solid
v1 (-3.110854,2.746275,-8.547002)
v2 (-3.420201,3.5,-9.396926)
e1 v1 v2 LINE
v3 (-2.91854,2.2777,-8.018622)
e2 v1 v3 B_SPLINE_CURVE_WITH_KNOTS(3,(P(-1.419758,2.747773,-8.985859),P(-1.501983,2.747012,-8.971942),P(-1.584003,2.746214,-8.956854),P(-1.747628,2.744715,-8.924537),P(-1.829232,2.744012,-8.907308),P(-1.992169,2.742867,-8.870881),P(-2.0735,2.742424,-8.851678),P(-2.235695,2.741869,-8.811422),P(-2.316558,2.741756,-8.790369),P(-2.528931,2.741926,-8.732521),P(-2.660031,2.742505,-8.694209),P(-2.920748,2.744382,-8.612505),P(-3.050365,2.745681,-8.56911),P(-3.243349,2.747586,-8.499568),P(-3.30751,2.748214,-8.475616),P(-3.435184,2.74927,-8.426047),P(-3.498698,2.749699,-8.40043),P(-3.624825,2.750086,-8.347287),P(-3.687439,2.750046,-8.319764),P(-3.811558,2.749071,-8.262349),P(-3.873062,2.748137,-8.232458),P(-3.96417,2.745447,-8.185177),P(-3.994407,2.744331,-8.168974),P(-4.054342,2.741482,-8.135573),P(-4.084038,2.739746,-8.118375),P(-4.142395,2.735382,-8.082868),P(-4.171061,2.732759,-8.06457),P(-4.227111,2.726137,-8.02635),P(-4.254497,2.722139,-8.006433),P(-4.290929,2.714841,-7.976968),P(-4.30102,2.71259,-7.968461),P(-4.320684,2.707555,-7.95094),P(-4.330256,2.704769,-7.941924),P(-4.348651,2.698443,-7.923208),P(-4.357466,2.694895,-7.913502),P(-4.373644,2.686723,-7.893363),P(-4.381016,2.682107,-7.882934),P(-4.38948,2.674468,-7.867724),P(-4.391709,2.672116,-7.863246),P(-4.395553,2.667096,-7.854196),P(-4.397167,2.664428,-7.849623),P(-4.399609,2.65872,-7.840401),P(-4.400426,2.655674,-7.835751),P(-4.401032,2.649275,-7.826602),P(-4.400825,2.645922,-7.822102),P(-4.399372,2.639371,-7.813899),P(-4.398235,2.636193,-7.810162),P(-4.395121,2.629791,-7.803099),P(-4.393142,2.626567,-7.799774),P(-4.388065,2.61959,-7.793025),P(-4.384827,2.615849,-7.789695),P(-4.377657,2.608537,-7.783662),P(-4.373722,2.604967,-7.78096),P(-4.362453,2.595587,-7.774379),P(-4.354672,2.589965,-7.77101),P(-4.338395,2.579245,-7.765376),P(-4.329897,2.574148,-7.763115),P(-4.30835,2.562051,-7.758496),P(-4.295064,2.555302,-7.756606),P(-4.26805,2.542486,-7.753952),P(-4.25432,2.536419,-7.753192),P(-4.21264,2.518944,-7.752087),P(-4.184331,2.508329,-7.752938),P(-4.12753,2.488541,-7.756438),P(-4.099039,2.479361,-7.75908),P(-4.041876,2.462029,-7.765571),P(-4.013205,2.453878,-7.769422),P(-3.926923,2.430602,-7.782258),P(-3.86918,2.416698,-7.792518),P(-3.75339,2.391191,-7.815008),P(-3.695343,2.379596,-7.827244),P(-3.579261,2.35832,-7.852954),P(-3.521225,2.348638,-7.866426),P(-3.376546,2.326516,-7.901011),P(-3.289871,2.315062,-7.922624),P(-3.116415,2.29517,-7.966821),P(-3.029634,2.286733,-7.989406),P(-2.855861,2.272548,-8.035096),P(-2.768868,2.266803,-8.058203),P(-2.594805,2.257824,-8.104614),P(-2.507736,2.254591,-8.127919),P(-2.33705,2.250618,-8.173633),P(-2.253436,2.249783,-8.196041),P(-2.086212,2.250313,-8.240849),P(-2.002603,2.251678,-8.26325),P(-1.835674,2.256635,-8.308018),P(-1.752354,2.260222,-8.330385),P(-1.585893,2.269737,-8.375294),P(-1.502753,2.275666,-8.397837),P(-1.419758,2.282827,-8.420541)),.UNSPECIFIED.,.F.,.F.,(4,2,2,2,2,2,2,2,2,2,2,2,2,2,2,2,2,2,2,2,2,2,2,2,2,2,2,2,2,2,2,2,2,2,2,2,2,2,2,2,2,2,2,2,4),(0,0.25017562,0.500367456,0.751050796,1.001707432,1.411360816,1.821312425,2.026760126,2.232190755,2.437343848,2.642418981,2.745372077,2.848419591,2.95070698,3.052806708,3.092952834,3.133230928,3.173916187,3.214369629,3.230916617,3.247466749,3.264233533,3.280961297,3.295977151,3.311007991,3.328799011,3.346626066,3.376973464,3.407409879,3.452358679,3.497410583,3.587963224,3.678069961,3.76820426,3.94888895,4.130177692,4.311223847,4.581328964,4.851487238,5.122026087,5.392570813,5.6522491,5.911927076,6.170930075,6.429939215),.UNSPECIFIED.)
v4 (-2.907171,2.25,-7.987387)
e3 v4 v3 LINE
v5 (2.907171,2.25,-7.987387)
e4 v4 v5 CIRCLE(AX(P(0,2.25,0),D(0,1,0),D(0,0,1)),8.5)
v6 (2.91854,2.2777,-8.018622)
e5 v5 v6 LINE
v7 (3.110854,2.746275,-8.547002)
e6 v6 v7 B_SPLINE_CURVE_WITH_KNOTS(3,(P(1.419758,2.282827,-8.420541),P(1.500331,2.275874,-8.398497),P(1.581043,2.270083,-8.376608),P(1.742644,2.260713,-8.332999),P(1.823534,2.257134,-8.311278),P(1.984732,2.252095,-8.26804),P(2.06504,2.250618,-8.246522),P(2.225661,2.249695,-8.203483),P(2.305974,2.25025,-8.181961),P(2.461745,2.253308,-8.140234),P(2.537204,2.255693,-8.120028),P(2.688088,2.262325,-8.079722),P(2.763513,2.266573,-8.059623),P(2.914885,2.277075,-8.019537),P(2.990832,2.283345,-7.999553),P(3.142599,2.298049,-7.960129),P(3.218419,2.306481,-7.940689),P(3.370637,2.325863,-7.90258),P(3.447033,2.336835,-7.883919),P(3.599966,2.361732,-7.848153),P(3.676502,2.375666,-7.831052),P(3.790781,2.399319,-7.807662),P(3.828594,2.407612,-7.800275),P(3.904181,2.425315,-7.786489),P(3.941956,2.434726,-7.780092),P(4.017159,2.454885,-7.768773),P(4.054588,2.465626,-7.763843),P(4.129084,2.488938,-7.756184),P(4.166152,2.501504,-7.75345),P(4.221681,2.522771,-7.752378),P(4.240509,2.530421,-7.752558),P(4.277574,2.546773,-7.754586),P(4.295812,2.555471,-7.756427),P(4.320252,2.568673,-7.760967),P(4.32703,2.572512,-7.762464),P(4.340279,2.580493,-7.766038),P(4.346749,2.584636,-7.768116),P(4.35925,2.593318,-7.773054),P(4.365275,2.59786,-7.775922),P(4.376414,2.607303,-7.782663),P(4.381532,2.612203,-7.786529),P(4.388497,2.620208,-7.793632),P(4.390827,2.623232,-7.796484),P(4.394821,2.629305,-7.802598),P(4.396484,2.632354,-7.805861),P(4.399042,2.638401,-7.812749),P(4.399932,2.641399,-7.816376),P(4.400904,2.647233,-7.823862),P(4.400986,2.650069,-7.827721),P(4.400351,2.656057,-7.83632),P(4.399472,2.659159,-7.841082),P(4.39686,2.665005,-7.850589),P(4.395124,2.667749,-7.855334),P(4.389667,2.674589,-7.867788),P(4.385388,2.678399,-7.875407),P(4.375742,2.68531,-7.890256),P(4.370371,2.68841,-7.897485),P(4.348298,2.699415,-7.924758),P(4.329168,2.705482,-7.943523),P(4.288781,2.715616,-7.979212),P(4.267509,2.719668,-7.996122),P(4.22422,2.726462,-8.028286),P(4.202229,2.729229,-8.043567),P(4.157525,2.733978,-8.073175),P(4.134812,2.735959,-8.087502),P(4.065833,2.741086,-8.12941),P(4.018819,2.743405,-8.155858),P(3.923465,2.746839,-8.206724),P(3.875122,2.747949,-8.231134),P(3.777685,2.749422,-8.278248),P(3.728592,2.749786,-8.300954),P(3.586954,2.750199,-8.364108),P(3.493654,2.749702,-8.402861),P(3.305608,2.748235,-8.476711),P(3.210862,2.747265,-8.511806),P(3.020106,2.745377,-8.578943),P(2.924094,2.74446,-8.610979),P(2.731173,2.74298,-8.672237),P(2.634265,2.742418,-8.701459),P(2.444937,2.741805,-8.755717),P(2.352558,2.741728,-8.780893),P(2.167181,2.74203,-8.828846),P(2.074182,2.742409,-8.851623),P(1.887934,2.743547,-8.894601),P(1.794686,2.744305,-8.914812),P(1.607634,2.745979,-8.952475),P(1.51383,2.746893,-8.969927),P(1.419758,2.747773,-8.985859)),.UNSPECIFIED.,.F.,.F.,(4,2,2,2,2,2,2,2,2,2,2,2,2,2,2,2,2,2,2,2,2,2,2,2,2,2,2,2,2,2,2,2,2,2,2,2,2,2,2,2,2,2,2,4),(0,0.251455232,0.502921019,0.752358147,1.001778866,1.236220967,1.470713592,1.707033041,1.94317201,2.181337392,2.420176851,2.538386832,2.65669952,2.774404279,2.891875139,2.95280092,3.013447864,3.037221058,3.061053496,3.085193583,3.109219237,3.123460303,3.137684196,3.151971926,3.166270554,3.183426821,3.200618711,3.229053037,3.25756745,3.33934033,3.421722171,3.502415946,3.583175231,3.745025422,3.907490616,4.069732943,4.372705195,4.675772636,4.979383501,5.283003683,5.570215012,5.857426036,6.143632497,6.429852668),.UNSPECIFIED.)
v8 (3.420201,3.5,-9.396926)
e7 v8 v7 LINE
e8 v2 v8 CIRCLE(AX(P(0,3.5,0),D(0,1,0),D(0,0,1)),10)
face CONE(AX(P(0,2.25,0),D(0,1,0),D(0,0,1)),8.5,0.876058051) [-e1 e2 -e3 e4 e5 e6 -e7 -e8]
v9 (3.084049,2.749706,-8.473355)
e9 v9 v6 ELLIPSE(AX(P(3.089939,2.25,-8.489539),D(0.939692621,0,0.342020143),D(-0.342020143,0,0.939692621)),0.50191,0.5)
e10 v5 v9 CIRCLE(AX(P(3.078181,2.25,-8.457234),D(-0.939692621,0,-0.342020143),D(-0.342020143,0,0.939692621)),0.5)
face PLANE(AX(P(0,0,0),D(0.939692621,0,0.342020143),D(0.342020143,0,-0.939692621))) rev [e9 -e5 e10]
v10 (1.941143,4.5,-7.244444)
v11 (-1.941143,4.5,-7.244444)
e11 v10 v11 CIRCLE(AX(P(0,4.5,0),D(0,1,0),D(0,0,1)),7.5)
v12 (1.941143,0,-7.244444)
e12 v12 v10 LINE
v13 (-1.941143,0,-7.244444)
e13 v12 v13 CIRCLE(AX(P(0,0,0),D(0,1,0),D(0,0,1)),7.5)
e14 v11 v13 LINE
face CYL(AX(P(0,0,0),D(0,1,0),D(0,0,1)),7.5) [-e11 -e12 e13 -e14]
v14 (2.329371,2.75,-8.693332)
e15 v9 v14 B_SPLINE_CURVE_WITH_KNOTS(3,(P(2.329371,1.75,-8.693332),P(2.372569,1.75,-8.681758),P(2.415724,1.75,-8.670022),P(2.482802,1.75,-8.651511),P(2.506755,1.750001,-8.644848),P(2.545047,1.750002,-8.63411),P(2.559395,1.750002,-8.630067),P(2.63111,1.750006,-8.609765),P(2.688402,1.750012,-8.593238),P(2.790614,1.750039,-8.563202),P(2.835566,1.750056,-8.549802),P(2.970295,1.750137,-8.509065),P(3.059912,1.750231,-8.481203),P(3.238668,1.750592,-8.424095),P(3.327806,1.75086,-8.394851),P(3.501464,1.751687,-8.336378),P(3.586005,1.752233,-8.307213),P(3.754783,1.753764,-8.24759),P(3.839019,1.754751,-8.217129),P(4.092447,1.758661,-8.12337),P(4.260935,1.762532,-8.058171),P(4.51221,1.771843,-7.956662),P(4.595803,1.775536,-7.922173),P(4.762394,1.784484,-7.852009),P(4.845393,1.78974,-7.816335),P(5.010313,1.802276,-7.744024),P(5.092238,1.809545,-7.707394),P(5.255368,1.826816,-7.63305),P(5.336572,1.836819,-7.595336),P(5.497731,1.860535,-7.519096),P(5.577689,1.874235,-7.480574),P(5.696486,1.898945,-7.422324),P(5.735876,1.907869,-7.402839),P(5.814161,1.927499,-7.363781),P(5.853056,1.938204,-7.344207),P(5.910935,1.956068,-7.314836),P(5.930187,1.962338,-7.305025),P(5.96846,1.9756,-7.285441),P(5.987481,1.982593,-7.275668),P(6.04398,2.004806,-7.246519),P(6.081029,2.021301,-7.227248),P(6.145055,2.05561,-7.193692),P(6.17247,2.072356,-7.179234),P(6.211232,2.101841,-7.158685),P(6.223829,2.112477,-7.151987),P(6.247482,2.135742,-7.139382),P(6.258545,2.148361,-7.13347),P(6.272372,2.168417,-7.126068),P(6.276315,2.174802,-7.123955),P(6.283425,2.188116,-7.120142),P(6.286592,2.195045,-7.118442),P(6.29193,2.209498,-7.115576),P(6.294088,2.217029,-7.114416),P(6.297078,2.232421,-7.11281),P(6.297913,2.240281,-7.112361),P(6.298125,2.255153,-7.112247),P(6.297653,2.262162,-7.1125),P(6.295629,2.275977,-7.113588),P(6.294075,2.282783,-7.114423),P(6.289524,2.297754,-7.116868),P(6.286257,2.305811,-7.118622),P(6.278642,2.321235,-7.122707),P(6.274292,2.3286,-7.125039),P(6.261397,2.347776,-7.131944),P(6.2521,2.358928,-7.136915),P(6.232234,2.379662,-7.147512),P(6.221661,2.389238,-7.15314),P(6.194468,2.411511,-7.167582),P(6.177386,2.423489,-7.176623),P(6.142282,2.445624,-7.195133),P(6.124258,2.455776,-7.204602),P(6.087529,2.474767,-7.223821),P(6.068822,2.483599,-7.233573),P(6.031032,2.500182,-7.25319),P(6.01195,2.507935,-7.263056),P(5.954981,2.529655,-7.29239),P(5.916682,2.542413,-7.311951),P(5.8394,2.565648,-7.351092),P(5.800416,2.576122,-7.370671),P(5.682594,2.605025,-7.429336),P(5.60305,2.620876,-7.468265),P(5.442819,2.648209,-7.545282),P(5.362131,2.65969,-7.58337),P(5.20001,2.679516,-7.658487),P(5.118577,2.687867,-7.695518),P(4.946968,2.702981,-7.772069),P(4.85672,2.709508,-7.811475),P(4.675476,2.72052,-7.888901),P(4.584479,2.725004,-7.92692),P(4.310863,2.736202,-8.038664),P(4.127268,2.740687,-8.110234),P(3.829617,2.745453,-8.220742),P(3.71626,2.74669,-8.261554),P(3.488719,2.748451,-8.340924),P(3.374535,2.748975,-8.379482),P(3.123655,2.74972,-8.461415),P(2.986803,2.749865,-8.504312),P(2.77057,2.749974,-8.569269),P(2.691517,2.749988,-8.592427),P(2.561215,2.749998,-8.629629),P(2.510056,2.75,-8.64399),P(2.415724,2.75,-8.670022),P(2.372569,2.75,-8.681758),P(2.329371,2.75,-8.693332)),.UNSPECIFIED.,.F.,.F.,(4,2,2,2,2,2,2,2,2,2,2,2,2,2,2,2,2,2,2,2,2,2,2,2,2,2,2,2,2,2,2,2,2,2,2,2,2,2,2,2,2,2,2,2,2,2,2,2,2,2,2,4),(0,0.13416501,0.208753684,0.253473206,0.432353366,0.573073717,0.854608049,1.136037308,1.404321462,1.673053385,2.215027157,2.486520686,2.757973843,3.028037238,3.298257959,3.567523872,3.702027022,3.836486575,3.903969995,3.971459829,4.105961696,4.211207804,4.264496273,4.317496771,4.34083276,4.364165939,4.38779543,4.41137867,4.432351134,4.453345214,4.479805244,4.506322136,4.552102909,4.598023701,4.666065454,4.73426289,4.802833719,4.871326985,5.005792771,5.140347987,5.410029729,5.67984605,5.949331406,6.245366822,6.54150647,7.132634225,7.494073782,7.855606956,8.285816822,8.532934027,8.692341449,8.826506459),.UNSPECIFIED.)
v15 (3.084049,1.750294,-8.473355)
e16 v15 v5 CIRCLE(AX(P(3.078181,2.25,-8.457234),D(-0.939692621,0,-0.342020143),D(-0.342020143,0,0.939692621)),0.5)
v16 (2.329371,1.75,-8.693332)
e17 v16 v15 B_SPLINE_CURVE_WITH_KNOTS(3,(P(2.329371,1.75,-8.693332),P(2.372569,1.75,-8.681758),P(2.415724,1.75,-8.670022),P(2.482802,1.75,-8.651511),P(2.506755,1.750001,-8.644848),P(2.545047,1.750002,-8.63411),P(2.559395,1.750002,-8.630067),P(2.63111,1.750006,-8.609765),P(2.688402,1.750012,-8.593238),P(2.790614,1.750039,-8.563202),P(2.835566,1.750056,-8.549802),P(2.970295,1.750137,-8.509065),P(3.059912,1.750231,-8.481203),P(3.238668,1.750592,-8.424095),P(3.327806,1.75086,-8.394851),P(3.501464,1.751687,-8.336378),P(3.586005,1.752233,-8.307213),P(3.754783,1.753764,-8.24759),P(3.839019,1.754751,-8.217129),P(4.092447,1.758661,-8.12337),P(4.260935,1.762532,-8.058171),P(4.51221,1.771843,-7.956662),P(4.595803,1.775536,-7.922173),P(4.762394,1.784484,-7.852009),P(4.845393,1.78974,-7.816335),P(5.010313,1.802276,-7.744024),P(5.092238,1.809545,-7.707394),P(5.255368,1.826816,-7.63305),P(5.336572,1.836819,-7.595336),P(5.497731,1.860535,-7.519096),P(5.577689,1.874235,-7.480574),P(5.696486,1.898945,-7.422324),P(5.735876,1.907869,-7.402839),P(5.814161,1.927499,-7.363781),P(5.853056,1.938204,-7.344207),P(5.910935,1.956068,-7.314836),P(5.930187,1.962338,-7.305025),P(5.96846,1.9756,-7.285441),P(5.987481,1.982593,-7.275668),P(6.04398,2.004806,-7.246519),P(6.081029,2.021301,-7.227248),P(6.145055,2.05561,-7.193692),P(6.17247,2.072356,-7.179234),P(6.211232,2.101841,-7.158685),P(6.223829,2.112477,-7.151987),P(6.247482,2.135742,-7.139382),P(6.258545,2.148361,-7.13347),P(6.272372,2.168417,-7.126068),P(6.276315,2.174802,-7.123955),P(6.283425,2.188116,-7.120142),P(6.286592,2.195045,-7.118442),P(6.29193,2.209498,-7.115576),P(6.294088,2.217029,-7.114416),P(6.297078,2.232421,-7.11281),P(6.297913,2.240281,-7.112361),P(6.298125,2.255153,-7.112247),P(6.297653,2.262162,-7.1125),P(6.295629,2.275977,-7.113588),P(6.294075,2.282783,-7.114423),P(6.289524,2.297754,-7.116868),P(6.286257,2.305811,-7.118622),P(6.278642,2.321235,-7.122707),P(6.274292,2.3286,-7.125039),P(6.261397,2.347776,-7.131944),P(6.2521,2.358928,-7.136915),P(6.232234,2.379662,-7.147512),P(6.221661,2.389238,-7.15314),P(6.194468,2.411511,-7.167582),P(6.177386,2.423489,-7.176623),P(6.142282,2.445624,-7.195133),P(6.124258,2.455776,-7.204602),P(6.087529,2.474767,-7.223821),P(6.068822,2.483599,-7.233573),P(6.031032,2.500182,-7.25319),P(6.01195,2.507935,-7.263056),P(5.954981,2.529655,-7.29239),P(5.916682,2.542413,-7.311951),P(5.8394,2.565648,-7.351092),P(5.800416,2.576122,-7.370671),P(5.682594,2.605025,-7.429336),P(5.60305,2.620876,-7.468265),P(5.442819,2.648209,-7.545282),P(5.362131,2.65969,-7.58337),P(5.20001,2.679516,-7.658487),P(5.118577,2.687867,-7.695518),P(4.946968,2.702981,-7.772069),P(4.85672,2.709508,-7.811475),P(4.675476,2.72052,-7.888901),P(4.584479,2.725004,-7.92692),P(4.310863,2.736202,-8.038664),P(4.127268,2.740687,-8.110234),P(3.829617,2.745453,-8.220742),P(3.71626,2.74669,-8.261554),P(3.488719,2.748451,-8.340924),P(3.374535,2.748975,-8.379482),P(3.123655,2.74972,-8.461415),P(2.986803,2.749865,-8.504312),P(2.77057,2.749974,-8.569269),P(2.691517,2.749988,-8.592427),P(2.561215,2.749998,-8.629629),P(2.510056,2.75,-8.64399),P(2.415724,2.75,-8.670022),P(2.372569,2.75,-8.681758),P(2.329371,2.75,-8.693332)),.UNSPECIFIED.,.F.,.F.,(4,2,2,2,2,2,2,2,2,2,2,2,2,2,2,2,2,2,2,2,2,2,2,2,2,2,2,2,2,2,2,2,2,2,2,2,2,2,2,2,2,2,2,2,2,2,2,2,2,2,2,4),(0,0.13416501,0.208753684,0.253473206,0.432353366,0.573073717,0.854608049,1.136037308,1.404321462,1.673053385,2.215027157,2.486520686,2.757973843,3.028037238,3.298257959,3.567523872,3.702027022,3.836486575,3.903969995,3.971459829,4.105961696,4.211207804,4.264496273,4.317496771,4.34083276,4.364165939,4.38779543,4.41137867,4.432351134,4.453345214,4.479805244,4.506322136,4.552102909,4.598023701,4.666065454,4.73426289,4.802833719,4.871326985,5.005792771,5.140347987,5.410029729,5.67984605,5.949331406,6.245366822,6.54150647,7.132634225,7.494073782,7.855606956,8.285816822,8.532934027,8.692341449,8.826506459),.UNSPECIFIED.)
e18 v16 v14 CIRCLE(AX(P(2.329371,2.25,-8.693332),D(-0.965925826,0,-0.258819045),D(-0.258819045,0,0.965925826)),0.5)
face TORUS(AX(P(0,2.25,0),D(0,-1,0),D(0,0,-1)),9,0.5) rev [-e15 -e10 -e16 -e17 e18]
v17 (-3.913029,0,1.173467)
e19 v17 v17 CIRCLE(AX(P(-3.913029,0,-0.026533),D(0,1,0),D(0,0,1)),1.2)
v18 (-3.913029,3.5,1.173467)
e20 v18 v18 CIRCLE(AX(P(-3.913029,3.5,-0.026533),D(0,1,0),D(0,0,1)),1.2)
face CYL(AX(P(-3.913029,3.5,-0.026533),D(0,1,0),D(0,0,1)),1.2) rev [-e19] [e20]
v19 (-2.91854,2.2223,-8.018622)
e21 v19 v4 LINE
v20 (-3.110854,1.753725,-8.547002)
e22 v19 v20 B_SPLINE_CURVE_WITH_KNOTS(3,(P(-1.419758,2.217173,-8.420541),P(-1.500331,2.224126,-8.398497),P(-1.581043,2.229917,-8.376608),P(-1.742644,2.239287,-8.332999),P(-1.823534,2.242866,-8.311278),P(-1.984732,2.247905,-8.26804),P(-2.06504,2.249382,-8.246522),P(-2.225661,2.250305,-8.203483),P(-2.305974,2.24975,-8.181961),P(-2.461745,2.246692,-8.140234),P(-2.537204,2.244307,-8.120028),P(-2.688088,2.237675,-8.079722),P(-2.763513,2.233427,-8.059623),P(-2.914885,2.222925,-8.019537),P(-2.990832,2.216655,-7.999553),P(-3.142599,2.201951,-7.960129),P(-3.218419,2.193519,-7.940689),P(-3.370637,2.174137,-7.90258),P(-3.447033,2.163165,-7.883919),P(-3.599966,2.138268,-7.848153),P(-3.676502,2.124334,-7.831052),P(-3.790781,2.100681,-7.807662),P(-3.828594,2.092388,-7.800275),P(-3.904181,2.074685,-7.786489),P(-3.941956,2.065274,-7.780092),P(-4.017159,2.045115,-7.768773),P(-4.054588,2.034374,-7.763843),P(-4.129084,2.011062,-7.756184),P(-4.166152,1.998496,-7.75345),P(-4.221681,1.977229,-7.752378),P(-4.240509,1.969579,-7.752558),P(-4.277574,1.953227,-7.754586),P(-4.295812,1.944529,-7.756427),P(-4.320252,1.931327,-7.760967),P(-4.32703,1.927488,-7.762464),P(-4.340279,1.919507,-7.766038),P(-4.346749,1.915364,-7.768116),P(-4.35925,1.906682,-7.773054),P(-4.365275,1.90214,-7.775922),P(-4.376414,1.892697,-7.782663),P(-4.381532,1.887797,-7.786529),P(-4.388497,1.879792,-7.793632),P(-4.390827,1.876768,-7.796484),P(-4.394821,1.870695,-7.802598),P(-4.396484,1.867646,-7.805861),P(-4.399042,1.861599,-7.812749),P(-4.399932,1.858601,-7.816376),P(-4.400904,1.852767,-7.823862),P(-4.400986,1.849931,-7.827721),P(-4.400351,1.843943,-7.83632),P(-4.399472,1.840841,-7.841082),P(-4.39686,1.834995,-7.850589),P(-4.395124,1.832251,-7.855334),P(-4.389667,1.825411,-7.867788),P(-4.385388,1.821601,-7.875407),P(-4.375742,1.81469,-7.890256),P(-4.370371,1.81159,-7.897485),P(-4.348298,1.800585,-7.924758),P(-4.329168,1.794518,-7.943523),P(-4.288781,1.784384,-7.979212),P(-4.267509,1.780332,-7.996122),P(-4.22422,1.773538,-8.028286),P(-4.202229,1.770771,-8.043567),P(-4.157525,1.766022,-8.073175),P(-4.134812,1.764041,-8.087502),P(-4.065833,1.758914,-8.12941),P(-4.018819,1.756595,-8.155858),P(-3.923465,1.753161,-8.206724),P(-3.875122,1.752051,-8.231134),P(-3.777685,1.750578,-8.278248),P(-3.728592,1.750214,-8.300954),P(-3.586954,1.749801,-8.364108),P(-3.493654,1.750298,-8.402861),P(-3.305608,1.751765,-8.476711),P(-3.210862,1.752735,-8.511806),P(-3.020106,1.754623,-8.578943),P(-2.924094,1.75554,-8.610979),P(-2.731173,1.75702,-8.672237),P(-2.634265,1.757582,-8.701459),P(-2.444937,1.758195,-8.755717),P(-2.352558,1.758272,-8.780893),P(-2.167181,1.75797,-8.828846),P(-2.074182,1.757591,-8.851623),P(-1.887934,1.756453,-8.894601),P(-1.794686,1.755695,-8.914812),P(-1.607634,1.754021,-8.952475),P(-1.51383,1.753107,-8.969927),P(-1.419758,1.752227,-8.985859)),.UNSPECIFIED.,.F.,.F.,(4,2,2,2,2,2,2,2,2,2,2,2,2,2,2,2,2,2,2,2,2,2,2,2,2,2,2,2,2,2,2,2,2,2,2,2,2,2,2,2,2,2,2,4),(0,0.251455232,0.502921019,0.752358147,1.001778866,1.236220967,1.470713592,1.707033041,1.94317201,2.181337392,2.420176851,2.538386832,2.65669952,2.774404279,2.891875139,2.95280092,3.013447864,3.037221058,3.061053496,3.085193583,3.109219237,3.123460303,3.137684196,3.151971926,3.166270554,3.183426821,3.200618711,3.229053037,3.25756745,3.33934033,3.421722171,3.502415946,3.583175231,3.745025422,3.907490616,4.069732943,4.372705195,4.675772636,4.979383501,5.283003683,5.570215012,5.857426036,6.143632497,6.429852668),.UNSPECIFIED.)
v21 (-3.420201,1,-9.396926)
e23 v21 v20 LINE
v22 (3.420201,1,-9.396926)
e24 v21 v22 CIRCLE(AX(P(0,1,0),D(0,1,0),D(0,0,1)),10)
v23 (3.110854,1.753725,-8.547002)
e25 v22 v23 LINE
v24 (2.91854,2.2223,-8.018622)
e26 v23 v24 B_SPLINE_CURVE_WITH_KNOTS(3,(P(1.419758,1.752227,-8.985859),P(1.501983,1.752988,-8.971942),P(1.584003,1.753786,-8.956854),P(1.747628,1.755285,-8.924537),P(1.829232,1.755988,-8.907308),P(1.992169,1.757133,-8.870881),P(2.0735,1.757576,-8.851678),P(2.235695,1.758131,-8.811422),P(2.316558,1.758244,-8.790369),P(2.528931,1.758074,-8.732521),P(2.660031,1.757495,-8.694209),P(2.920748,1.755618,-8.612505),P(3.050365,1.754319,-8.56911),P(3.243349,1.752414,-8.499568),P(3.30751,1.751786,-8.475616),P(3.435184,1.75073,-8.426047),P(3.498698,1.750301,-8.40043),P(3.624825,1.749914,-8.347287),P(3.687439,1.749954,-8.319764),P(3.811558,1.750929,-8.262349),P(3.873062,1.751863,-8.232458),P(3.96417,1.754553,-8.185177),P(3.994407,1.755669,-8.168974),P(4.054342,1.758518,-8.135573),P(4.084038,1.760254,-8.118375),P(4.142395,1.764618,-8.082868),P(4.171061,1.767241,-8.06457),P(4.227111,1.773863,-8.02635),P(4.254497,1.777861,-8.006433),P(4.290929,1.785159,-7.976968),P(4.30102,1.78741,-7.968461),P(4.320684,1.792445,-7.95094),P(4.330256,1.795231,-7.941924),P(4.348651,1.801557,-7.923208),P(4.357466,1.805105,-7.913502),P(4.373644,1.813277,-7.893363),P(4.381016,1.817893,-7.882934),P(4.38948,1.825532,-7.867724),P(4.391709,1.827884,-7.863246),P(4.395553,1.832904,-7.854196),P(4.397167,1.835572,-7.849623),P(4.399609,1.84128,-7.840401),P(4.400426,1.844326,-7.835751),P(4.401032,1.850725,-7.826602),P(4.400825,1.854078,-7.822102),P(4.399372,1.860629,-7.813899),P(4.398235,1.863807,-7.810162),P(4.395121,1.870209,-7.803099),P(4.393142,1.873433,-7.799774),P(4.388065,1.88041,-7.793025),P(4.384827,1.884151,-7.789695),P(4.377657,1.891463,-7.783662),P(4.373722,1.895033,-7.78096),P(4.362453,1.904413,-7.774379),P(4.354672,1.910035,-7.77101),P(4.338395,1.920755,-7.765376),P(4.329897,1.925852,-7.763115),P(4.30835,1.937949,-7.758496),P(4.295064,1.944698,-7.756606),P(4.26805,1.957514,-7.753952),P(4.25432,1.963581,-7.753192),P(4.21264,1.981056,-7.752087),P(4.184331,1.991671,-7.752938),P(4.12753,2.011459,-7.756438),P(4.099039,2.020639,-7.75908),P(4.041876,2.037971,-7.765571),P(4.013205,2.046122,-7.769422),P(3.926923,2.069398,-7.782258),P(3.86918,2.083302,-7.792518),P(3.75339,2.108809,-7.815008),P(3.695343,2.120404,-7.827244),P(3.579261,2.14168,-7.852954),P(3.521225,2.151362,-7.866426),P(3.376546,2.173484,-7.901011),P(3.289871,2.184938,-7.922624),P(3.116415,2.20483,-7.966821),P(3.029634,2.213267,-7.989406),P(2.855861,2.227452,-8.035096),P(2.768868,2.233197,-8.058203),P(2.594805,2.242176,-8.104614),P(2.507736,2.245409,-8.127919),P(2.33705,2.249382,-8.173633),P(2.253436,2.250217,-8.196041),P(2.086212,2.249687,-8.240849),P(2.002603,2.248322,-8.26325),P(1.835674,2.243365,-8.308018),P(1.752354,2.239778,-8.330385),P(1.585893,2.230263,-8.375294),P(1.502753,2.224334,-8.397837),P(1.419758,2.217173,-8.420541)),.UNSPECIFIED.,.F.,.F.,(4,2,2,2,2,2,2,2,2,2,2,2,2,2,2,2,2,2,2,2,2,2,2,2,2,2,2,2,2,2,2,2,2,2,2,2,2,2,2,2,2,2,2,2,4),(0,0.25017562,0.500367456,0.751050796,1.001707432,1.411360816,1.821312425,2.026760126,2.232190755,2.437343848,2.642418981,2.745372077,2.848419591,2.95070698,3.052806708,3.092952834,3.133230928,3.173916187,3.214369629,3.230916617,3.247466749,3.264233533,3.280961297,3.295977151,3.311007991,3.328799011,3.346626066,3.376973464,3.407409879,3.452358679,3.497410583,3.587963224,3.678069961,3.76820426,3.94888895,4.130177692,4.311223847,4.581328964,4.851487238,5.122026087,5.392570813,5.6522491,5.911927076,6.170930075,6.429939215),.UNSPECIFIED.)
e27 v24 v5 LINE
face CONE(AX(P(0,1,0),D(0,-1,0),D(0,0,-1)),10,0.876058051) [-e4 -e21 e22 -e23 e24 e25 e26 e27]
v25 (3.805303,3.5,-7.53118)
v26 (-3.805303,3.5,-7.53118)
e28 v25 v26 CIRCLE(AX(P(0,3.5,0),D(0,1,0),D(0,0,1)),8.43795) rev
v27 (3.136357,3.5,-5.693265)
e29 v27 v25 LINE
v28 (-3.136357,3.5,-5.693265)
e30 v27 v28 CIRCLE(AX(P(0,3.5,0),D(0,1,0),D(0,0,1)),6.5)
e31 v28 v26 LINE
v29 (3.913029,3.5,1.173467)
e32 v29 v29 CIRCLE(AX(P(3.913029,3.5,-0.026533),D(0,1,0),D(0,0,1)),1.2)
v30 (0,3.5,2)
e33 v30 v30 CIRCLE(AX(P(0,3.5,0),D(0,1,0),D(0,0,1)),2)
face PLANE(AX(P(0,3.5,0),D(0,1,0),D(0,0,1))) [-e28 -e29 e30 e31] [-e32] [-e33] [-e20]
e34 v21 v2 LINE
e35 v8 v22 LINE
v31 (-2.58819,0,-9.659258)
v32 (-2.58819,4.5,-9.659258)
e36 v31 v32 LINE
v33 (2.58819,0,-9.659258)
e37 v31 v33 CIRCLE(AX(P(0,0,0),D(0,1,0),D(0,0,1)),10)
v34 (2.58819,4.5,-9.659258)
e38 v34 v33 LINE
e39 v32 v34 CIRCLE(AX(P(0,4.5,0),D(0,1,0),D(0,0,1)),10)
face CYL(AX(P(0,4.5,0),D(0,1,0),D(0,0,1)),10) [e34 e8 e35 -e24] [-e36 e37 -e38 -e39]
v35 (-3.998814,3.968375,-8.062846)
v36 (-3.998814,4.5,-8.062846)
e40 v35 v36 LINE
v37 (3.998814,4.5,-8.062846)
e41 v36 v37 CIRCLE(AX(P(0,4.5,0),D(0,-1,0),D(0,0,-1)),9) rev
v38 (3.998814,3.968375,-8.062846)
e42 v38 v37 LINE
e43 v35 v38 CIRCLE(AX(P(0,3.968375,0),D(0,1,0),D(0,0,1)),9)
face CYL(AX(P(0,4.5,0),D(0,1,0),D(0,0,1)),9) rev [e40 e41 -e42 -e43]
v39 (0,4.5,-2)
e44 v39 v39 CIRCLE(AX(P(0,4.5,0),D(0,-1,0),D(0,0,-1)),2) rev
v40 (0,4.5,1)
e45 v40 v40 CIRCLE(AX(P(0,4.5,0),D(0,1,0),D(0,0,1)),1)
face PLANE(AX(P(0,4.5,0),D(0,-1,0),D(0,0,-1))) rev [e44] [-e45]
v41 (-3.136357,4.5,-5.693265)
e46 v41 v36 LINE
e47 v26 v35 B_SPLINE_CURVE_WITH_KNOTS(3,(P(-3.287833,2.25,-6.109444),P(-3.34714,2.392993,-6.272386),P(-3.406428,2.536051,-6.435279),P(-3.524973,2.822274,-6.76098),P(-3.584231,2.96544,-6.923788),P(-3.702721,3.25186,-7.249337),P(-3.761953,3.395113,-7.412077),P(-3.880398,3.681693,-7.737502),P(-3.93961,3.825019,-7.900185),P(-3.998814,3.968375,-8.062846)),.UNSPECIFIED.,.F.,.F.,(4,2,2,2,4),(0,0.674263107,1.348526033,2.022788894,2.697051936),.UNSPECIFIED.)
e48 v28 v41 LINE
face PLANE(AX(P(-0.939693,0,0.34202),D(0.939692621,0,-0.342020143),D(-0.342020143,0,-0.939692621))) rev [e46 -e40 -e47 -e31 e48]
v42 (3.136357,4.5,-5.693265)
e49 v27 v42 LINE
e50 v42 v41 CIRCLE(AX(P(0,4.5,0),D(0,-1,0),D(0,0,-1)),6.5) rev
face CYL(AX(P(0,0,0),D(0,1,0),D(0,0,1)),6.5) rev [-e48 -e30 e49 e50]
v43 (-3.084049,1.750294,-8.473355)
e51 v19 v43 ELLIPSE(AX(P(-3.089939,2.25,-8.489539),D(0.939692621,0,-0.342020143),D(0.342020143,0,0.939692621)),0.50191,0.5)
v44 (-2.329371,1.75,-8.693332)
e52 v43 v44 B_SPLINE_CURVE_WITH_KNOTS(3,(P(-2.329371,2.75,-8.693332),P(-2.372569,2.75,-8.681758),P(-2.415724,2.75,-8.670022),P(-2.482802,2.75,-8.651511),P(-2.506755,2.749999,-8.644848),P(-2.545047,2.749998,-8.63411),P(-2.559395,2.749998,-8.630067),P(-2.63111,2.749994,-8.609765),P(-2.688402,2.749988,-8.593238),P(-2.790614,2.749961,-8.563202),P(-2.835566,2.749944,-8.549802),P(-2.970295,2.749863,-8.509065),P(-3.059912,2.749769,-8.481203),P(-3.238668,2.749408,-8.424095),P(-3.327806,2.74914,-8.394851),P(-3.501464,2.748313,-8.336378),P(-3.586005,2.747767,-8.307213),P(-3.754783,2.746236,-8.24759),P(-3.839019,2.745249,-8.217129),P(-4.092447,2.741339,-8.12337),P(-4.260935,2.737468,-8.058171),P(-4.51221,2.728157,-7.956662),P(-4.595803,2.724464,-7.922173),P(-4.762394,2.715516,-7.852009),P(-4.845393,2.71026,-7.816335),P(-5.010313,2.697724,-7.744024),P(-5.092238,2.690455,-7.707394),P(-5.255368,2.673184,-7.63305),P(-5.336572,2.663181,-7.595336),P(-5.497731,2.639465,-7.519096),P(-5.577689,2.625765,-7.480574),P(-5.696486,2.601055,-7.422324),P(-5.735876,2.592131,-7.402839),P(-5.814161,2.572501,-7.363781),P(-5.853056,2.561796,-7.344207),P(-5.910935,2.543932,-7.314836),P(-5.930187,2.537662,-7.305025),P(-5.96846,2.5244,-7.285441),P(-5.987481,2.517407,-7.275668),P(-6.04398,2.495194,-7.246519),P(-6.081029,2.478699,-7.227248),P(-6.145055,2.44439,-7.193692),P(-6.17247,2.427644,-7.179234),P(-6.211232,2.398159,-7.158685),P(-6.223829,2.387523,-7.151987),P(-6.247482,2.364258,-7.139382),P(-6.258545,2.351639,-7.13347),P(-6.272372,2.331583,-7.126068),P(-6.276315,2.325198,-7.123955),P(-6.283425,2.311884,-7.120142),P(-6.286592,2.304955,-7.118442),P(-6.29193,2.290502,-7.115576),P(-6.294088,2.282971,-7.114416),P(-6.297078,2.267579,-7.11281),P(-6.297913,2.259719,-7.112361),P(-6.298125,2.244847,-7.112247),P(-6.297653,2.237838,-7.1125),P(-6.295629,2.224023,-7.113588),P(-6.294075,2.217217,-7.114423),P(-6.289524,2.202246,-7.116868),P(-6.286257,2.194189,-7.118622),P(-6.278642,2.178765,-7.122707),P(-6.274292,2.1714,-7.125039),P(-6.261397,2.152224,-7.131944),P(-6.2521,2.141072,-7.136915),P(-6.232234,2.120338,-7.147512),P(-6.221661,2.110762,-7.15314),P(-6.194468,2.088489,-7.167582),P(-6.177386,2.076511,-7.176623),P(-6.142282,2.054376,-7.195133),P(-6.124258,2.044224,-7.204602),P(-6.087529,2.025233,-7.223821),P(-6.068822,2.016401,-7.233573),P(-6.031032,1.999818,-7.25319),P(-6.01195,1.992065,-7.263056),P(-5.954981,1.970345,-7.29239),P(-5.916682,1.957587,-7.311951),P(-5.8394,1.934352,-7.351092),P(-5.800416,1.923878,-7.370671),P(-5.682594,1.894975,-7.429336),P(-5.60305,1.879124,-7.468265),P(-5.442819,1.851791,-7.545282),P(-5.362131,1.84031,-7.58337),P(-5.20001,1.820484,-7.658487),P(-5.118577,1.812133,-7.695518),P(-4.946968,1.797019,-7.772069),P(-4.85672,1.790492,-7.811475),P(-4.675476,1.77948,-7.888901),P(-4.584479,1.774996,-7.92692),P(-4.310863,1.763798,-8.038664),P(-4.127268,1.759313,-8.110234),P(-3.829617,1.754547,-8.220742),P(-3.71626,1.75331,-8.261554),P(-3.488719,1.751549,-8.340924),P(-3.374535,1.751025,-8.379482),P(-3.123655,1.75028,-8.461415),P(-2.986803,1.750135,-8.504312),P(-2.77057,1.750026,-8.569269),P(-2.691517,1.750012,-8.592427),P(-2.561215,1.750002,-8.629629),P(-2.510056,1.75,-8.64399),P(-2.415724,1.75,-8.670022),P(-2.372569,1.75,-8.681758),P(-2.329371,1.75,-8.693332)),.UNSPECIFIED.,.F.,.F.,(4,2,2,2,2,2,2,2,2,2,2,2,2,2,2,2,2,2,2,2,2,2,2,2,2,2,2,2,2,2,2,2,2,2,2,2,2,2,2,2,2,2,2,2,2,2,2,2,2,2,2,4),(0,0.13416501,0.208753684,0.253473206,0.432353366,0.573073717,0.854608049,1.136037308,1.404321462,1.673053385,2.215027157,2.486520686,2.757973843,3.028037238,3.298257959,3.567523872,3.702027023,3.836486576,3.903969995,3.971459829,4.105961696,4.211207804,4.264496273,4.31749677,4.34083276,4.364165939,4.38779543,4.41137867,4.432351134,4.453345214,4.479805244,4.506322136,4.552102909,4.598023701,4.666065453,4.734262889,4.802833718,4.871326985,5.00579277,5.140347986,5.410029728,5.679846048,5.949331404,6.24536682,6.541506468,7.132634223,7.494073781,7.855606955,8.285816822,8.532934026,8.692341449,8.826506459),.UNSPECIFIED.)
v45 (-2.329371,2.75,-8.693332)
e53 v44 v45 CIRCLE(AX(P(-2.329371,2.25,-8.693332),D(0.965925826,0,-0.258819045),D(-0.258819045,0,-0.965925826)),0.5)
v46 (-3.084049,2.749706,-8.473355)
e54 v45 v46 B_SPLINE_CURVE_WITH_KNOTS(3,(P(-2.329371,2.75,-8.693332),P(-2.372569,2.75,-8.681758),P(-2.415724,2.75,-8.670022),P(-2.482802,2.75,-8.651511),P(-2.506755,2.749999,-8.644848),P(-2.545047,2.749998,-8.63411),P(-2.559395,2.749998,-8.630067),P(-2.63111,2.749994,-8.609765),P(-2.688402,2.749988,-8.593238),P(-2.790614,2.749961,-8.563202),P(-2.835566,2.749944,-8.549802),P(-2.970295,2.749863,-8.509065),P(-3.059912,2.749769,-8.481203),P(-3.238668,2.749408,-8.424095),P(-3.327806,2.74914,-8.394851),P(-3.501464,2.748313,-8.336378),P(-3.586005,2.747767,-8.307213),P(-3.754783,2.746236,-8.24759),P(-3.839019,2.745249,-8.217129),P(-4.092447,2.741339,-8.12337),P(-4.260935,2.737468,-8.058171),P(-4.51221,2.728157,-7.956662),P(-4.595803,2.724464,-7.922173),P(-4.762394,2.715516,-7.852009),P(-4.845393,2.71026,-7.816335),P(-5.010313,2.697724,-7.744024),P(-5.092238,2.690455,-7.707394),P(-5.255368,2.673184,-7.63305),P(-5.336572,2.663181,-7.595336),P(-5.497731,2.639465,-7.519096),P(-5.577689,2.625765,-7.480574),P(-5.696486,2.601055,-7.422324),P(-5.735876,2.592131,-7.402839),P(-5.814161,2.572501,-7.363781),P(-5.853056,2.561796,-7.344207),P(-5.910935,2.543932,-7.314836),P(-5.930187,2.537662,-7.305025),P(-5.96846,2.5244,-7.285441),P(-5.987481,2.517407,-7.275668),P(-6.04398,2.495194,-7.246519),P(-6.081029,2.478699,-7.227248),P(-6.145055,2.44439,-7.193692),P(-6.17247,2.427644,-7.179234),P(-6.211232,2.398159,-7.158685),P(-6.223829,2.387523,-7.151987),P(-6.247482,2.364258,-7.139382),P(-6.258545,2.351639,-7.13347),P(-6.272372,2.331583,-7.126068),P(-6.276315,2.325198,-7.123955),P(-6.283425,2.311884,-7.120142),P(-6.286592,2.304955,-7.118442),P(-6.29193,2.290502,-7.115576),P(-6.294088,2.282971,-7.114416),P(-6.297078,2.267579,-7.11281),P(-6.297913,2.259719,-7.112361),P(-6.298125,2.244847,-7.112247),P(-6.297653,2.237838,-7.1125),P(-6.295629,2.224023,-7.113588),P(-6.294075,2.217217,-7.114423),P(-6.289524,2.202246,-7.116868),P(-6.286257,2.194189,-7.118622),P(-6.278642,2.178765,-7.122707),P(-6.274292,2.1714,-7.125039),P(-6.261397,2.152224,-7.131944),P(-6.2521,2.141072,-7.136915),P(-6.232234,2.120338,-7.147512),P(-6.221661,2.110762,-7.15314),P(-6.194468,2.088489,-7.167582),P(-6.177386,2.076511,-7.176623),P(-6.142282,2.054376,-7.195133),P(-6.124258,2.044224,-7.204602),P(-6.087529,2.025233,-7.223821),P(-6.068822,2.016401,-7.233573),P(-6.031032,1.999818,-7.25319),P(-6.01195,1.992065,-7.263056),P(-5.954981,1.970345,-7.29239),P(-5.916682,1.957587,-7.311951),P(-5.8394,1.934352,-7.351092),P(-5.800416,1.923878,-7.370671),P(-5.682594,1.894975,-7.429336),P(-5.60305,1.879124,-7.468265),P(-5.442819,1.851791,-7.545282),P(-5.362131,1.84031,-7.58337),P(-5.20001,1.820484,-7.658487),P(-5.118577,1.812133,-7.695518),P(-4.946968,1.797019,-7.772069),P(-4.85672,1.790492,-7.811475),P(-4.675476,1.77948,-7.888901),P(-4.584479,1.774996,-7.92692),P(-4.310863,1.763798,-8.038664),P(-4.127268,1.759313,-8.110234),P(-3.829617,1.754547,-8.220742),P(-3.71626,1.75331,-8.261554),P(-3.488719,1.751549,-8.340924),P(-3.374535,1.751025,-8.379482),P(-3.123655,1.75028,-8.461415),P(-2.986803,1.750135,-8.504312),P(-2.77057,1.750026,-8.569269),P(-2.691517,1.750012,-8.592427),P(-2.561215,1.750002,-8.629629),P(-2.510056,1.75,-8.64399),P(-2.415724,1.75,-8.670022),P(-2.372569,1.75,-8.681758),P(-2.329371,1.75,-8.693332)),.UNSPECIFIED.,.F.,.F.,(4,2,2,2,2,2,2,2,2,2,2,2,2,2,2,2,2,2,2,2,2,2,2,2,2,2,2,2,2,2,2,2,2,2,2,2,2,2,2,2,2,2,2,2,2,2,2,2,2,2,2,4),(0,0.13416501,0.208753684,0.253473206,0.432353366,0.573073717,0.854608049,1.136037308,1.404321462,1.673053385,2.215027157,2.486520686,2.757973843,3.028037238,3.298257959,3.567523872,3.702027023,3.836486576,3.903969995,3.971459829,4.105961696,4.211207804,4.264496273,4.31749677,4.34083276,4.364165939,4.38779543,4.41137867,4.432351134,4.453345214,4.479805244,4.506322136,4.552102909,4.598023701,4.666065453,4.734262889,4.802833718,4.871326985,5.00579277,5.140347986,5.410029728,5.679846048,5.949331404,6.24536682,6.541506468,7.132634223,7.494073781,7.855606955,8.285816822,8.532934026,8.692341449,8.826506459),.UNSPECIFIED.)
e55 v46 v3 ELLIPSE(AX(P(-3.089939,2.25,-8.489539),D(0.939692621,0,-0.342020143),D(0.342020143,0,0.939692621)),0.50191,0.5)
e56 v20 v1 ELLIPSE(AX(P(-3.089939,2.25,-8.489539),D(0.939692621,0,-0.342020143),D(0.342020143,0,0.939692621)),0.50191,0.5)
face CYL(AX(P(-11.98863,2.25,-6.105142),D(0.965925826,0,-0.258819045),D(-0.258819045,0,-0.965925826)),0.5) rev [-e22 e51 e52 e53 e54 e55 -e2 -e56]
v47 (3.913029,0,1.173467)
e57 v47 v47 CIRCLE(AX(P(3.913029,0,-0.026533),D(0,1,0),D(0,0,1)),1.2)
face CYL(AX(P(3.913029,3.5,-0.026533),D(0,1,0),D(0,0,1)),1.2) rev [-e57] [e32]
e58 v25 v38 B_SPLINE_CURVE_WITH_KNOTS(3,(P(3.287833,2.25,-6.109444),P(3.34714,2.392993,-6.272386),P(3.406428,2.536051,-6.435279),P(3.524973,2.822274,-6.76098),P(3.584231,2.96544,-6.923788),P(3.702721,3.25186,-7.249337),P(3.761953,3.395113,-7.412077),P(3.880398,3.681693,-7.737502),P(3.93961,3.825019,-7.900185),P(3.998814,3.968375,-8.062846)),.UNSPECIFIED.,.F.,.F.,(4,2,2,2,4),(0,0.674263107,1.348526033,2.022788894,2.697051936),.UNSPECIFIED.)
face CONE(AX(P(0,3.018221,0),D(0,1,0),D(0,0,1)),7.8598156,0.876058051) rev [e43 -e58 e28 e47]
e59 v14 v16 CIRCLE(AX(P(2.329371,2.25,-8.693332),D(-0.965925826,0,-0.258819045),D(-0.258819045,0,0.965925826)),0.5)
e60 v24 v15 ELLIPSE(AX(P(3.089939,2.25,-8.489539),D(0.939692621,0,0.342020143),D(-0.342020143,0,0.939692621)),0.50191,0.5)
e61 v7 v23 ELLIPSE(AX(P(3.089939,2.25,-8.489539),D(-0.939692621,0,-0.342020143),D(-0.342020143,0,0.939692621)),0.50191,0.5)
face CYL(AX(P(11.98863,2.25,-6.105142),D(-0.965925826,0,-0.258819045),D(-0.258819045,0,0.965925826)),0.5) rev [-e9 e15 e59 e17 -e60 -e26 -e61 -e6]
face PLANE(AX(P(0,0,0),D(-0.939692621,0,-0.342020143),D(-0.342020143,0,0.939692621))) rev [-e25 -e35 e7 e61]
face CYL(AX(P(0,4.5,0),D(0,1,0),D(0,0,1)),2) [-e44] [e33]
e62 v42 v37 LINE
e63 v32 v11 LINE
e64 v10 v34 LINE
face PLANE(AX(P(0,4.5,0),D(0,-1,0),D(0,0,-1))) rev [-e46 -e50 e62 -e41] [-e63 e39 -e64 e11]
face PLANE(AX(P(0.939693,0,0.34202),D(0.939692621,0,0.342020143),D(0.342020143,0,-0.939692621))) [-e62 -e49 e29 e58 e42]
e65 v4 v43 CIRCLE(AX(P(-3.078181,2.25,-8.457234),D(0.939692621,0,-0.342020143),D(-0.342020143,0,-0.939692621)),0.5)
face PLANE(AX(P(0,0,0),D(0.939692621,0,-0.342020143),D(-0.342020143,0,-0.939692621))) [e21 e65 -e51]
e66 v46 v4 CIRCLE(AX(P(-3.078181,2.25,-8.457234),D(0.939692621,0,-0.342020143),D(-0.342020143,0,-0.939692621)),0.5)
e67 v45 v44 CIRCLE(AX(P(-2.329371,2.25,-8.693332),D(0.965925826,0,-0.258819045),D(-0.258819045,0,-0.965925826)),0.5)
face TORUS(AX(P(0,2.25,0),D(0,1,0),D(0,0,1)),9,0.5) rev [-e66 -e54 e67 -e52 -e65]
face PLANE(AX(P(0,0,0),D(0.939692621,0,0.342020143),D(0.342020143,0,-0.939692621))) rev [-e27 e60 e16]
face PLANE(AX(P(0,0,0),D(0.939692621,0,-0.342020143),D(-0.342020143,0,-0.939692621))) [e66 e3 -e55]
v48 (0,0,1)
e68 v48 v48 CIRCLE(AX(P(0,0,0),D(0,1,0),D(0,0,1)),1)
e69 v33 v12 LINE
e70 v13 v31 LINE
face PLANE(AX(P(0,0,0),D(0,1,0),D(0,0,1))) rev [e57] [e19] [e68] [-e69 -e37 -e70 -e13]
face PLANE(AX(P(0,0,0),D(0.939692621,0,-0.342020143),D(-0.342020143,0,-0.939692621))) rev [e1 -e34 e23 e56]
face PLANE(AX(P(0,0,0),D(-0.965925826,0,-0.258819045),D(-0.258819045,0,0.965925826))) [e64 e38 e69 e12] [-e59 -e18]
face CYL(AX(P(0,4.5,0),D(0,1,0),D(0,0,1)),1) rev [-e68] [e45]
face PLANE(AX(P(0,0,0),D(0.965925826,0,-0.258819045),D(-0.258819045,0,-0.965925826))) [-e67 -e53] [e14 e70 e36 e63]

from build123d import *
from build123d.topology import SkipClean

# Parameters (mm, degrees)
CUT_EXTRUDE1_DEPTH       = 15.84082208
SHELL2_START             = 3.968374946
SHELL2_OUTLINE_R         = 2
SHELL2_DEPTH             = 0.531625054
SHELL2_START_2           = 3
SHELL2_3_DEPTH           = 0.968374946
SKETCH6_W                = 2.5
SKETCH6_H                = 4.5
SKETCH6_R                = 0.5
REVOLVE2_ANGLE           = 5
SKETCH9_R                = 0.5
REVOLVE3_ANGLE           = 5
SKETCH13_R               = 0.5
CUT_EXTRUDE3_DEPTH       = 10
CUT_EXTRUDE4_START       = -3
CUT_EXTRUDE4_OUTLINE_R   = 0.5
CUT_EXTRUDE4_DEPTH       = 3
M2_CLEARANCE_HOLE1_D     = 2.4
M2_CLEARANCE_HOLE1_DEPTH = 3.5
M2_CLEARANCE_HOLE1_TIP   = 0.721032743


with BuildPart() as part:
    # Sketch2 → Revolve1 (revolve)
    with BuildSketch(Plane.XY, mode=Mode.PRIVATE) as revolve1_sk:
        Polygon((10, 4.5), (1, 4.5), (1, 0), (10, 0), (10, 1), (8.5, 2.25), (10, 3.5), align=None)
    revolve(revolve1_sk.sketch.rotate(Axis((0, 4.5, 0), (0, -1, 0)), 90), axis=Axis((0, 4.5, 0), (0, -1, 0)))

    # Sketch3 → Cut-Extrude1 (cut, through all)
    with BuildSketch(Plane(origin=(0, 4.5, 0), x_dir=(1, 0, 0), z_dir=(0, 1, 0))):
        with BuildLine():
            Line((-3.420201433, 9.396926208), (-2.565151075, 7.047694656))
            ThreePointArc((-2.565151075, 7.047694656), (0, 7.5), (2.565151075, 7.047694656))
            Line((2.565151075, 7.047694656), (3.420201433, 9.396926208))
            ThreePointArc((3.420201433, 9.396926208), (0, 10), (-3.420201433, 9.396926208))
        make_face()
    extrude(amount=-CUT_EXTRUDE1_DEPTH, mode=Mode.SUBTRACT)

    # Shell2: read off the stored shape, not the designer's step
    # Shell2 outline → Shell2 (cut)
    with BuildSketch(Plane(origin=(0, 0, 0), x_dir=(1, 0, 0), z_dir=(0, 1, 0)).offset(SHELL2_START)):
        with BuildLine():
            Line((-3.136356765, 5.69326499), (-3.998813781, 8.062846169))
            ThreePointArc((-3.998813781, 8.062846169), (0, -9), (3.998813781, 8.062846169))
            Line((3.998813781, 8.062846169), (3.136356765, 5.69326499))
            ThreePointArc((3.136356765, 5.69326499), (0, 6.5), (-3.136356765, 5.69326499))
        make_face()
        Circle(SHELL2_OUTLINE_R, mode=Mode.SUBTRACT)
    extrude(amount=SHELL2_DEPTH, mode=Mode.SUBTRACT)

    # Shell2 2 outline → Shell2 2 (revolve, cut)
    with BuildSketch(Plane.XY):
        Polygon((2, 3.968374946), (2, 3.5), (8.437950065, 3.5), (9, 3.968374946), align=None)
    revolve(axis=Axis((0, 0, 0), (0, 1, 0)), mode=Mode.SUBTRACT)

    # Shell2 3 outline → Shell2 3 (add)
    with BuildSketch(Plane(origin=(0, 0, 0), x_dir=(1, 0, 0), z_dir=(0, 1, 0)).offset(SHELL2_START_2)):
        with BuildLine():
            Line((3.136356765, 5.69326499), (3.998813781, 8.062846169))
            ThreePointArc((3.998813781, 8.062846169), (3.54398789, 8.272856208), (3.07818129, 8.457233587))
            Line((3.07818129, 8.457233587), (2.565151075, 7.047694656))
            ThreePointArc((2.565151075, 7.047694656), (0, 7.5), (-2.565151075, 7.047694656))
            Line((-2.565151075, 7.047694656), (-3.07818129, 8.457233587))
            ThreePointArc((-3.07818129, 8.457233587), (-3.54398789, 8.272856208), (-3.998813781, 8.062846169))
            Line((-3.998813781, 8.062846169), (-3.136356765, 5.69326499))
            ThreePointArc((-3.136356765, 5.69326499), (0, 6.5), (3.136356765, 5.69326499))
        make_face()
    extrude(amount=SHELL2_3_DEPTH)

    # Sketch6 → Revolve2 (revolve)
    with BuildSketch(Plane(origin=(0, 0, 0), x_dir=(-0.3420201433256695, 0, -0.9396926207859082), z_dir=(0.9396926207859082, 0, -0.3420201433256695))):
        with Locations((8.75, 2.25)):
            Rectangle(SKETCH6_W, SKETCH6_H)
        with Locations((9, 2.25)):
            Circle(SKETCH6_R, mode=Mode.SUBTRACT)
    revolve(axis=Axis((0, 0, 0), (0, -1, 0)), revolution_arc=REVOLVE2_ANGLE)

    # Sketch9 → Revolve3 (revolve)
    with SkipClean():  # the faces are left unmerged after this step: merging them gives an invalid solid
        with BuildSketch(Plane(origin=(0, 0, 0), x_dir=(-0.3420201433256693, 0, 0.9396926207859082), z_dir=(-0.9396926207859083, 0, -0.3420201433256693))):
            Polygon((-10, 3.5), (-10, 1), (-10, 0), (-7.5, 0), (-7.5, 4.5), (-10, 4.5), align=None)
            with Locations((-9, 2.25)):
                Circle(SKETCH9_R, mode=Mode.SUBTRACT)
        revolve(axis=Axis((0, 0, 0), (0, 1, 0)), revolution_arc=REVOLVE3_ANGLE)

    # Sketch13 → Cut-Extrude3 (cut)
    with SkipClean():  # the faces are left unmerged after this step: merging them gives an invalid solid
        with BuildSketch(Plane(origin=(0, 0, 0), x_dir=(-0.25881904510252113, 0, 0.9659258262890683), z_dir=(-0.9659258262890683, 0, -0.25881904510252113))):
            with Locations((-9, 2.25)):
                Circle(SKETCH13_R)
        extrude(amount=-CUT_EXTRUDE3_DEPTH, mode=Mode.SUBTRACT)

    # Cut-Extrude4: read off the stored shape, not the designer's step
    # Cut-Extrude4 outline → Cut-Extrude4 (cut)
    with SkipClean():  # the faces are left unmerged after this step: merging them gives an invalid solid
        with BuildSketch(Plane(origin=(0, 0, 0), x_dir=(-0.25881904510252135, 0, -0.9659258262890681), z_dir=(0.9659258262890681, 0, -0.25881904510252135)).offset(CUT_EXTRUDE4_START)):
            with Locations((9, 2.25)):
                Circle(CUT_EXTRUDE4_OUTLINE_R)
        extrude(amount=CUT_EXTRUDE4_DEPTH, mode=Mode.SUBTRACT)

    # M2 Clearance Hole1
    with Locations(Plane(origin=(-3.913029006, 3.5, -0.02653295), x_dir=(0, 0, 1), z_dir=(0, 1, 0))):
        with Locations((0, 0), (0, 7.826058012)):
            Hole(M2_CLEARANCE_HOLE1_D / 2, depth=M2_CLEARANCE_HOLE1_DEPTH)
            with Locations((0, 0, -(M2_CLEARANCE_HOLE1_DEPTH + M2_CLEARANCE_HOLE1_TIP / 2))):  # 118° drill point
                Cone(0, M2_CLEARANCE_HOLE1_D / 2, M2_CLEARANCE_HOLE1_TIP, mode=Mode.SUBTRACT)


solid = part.part
